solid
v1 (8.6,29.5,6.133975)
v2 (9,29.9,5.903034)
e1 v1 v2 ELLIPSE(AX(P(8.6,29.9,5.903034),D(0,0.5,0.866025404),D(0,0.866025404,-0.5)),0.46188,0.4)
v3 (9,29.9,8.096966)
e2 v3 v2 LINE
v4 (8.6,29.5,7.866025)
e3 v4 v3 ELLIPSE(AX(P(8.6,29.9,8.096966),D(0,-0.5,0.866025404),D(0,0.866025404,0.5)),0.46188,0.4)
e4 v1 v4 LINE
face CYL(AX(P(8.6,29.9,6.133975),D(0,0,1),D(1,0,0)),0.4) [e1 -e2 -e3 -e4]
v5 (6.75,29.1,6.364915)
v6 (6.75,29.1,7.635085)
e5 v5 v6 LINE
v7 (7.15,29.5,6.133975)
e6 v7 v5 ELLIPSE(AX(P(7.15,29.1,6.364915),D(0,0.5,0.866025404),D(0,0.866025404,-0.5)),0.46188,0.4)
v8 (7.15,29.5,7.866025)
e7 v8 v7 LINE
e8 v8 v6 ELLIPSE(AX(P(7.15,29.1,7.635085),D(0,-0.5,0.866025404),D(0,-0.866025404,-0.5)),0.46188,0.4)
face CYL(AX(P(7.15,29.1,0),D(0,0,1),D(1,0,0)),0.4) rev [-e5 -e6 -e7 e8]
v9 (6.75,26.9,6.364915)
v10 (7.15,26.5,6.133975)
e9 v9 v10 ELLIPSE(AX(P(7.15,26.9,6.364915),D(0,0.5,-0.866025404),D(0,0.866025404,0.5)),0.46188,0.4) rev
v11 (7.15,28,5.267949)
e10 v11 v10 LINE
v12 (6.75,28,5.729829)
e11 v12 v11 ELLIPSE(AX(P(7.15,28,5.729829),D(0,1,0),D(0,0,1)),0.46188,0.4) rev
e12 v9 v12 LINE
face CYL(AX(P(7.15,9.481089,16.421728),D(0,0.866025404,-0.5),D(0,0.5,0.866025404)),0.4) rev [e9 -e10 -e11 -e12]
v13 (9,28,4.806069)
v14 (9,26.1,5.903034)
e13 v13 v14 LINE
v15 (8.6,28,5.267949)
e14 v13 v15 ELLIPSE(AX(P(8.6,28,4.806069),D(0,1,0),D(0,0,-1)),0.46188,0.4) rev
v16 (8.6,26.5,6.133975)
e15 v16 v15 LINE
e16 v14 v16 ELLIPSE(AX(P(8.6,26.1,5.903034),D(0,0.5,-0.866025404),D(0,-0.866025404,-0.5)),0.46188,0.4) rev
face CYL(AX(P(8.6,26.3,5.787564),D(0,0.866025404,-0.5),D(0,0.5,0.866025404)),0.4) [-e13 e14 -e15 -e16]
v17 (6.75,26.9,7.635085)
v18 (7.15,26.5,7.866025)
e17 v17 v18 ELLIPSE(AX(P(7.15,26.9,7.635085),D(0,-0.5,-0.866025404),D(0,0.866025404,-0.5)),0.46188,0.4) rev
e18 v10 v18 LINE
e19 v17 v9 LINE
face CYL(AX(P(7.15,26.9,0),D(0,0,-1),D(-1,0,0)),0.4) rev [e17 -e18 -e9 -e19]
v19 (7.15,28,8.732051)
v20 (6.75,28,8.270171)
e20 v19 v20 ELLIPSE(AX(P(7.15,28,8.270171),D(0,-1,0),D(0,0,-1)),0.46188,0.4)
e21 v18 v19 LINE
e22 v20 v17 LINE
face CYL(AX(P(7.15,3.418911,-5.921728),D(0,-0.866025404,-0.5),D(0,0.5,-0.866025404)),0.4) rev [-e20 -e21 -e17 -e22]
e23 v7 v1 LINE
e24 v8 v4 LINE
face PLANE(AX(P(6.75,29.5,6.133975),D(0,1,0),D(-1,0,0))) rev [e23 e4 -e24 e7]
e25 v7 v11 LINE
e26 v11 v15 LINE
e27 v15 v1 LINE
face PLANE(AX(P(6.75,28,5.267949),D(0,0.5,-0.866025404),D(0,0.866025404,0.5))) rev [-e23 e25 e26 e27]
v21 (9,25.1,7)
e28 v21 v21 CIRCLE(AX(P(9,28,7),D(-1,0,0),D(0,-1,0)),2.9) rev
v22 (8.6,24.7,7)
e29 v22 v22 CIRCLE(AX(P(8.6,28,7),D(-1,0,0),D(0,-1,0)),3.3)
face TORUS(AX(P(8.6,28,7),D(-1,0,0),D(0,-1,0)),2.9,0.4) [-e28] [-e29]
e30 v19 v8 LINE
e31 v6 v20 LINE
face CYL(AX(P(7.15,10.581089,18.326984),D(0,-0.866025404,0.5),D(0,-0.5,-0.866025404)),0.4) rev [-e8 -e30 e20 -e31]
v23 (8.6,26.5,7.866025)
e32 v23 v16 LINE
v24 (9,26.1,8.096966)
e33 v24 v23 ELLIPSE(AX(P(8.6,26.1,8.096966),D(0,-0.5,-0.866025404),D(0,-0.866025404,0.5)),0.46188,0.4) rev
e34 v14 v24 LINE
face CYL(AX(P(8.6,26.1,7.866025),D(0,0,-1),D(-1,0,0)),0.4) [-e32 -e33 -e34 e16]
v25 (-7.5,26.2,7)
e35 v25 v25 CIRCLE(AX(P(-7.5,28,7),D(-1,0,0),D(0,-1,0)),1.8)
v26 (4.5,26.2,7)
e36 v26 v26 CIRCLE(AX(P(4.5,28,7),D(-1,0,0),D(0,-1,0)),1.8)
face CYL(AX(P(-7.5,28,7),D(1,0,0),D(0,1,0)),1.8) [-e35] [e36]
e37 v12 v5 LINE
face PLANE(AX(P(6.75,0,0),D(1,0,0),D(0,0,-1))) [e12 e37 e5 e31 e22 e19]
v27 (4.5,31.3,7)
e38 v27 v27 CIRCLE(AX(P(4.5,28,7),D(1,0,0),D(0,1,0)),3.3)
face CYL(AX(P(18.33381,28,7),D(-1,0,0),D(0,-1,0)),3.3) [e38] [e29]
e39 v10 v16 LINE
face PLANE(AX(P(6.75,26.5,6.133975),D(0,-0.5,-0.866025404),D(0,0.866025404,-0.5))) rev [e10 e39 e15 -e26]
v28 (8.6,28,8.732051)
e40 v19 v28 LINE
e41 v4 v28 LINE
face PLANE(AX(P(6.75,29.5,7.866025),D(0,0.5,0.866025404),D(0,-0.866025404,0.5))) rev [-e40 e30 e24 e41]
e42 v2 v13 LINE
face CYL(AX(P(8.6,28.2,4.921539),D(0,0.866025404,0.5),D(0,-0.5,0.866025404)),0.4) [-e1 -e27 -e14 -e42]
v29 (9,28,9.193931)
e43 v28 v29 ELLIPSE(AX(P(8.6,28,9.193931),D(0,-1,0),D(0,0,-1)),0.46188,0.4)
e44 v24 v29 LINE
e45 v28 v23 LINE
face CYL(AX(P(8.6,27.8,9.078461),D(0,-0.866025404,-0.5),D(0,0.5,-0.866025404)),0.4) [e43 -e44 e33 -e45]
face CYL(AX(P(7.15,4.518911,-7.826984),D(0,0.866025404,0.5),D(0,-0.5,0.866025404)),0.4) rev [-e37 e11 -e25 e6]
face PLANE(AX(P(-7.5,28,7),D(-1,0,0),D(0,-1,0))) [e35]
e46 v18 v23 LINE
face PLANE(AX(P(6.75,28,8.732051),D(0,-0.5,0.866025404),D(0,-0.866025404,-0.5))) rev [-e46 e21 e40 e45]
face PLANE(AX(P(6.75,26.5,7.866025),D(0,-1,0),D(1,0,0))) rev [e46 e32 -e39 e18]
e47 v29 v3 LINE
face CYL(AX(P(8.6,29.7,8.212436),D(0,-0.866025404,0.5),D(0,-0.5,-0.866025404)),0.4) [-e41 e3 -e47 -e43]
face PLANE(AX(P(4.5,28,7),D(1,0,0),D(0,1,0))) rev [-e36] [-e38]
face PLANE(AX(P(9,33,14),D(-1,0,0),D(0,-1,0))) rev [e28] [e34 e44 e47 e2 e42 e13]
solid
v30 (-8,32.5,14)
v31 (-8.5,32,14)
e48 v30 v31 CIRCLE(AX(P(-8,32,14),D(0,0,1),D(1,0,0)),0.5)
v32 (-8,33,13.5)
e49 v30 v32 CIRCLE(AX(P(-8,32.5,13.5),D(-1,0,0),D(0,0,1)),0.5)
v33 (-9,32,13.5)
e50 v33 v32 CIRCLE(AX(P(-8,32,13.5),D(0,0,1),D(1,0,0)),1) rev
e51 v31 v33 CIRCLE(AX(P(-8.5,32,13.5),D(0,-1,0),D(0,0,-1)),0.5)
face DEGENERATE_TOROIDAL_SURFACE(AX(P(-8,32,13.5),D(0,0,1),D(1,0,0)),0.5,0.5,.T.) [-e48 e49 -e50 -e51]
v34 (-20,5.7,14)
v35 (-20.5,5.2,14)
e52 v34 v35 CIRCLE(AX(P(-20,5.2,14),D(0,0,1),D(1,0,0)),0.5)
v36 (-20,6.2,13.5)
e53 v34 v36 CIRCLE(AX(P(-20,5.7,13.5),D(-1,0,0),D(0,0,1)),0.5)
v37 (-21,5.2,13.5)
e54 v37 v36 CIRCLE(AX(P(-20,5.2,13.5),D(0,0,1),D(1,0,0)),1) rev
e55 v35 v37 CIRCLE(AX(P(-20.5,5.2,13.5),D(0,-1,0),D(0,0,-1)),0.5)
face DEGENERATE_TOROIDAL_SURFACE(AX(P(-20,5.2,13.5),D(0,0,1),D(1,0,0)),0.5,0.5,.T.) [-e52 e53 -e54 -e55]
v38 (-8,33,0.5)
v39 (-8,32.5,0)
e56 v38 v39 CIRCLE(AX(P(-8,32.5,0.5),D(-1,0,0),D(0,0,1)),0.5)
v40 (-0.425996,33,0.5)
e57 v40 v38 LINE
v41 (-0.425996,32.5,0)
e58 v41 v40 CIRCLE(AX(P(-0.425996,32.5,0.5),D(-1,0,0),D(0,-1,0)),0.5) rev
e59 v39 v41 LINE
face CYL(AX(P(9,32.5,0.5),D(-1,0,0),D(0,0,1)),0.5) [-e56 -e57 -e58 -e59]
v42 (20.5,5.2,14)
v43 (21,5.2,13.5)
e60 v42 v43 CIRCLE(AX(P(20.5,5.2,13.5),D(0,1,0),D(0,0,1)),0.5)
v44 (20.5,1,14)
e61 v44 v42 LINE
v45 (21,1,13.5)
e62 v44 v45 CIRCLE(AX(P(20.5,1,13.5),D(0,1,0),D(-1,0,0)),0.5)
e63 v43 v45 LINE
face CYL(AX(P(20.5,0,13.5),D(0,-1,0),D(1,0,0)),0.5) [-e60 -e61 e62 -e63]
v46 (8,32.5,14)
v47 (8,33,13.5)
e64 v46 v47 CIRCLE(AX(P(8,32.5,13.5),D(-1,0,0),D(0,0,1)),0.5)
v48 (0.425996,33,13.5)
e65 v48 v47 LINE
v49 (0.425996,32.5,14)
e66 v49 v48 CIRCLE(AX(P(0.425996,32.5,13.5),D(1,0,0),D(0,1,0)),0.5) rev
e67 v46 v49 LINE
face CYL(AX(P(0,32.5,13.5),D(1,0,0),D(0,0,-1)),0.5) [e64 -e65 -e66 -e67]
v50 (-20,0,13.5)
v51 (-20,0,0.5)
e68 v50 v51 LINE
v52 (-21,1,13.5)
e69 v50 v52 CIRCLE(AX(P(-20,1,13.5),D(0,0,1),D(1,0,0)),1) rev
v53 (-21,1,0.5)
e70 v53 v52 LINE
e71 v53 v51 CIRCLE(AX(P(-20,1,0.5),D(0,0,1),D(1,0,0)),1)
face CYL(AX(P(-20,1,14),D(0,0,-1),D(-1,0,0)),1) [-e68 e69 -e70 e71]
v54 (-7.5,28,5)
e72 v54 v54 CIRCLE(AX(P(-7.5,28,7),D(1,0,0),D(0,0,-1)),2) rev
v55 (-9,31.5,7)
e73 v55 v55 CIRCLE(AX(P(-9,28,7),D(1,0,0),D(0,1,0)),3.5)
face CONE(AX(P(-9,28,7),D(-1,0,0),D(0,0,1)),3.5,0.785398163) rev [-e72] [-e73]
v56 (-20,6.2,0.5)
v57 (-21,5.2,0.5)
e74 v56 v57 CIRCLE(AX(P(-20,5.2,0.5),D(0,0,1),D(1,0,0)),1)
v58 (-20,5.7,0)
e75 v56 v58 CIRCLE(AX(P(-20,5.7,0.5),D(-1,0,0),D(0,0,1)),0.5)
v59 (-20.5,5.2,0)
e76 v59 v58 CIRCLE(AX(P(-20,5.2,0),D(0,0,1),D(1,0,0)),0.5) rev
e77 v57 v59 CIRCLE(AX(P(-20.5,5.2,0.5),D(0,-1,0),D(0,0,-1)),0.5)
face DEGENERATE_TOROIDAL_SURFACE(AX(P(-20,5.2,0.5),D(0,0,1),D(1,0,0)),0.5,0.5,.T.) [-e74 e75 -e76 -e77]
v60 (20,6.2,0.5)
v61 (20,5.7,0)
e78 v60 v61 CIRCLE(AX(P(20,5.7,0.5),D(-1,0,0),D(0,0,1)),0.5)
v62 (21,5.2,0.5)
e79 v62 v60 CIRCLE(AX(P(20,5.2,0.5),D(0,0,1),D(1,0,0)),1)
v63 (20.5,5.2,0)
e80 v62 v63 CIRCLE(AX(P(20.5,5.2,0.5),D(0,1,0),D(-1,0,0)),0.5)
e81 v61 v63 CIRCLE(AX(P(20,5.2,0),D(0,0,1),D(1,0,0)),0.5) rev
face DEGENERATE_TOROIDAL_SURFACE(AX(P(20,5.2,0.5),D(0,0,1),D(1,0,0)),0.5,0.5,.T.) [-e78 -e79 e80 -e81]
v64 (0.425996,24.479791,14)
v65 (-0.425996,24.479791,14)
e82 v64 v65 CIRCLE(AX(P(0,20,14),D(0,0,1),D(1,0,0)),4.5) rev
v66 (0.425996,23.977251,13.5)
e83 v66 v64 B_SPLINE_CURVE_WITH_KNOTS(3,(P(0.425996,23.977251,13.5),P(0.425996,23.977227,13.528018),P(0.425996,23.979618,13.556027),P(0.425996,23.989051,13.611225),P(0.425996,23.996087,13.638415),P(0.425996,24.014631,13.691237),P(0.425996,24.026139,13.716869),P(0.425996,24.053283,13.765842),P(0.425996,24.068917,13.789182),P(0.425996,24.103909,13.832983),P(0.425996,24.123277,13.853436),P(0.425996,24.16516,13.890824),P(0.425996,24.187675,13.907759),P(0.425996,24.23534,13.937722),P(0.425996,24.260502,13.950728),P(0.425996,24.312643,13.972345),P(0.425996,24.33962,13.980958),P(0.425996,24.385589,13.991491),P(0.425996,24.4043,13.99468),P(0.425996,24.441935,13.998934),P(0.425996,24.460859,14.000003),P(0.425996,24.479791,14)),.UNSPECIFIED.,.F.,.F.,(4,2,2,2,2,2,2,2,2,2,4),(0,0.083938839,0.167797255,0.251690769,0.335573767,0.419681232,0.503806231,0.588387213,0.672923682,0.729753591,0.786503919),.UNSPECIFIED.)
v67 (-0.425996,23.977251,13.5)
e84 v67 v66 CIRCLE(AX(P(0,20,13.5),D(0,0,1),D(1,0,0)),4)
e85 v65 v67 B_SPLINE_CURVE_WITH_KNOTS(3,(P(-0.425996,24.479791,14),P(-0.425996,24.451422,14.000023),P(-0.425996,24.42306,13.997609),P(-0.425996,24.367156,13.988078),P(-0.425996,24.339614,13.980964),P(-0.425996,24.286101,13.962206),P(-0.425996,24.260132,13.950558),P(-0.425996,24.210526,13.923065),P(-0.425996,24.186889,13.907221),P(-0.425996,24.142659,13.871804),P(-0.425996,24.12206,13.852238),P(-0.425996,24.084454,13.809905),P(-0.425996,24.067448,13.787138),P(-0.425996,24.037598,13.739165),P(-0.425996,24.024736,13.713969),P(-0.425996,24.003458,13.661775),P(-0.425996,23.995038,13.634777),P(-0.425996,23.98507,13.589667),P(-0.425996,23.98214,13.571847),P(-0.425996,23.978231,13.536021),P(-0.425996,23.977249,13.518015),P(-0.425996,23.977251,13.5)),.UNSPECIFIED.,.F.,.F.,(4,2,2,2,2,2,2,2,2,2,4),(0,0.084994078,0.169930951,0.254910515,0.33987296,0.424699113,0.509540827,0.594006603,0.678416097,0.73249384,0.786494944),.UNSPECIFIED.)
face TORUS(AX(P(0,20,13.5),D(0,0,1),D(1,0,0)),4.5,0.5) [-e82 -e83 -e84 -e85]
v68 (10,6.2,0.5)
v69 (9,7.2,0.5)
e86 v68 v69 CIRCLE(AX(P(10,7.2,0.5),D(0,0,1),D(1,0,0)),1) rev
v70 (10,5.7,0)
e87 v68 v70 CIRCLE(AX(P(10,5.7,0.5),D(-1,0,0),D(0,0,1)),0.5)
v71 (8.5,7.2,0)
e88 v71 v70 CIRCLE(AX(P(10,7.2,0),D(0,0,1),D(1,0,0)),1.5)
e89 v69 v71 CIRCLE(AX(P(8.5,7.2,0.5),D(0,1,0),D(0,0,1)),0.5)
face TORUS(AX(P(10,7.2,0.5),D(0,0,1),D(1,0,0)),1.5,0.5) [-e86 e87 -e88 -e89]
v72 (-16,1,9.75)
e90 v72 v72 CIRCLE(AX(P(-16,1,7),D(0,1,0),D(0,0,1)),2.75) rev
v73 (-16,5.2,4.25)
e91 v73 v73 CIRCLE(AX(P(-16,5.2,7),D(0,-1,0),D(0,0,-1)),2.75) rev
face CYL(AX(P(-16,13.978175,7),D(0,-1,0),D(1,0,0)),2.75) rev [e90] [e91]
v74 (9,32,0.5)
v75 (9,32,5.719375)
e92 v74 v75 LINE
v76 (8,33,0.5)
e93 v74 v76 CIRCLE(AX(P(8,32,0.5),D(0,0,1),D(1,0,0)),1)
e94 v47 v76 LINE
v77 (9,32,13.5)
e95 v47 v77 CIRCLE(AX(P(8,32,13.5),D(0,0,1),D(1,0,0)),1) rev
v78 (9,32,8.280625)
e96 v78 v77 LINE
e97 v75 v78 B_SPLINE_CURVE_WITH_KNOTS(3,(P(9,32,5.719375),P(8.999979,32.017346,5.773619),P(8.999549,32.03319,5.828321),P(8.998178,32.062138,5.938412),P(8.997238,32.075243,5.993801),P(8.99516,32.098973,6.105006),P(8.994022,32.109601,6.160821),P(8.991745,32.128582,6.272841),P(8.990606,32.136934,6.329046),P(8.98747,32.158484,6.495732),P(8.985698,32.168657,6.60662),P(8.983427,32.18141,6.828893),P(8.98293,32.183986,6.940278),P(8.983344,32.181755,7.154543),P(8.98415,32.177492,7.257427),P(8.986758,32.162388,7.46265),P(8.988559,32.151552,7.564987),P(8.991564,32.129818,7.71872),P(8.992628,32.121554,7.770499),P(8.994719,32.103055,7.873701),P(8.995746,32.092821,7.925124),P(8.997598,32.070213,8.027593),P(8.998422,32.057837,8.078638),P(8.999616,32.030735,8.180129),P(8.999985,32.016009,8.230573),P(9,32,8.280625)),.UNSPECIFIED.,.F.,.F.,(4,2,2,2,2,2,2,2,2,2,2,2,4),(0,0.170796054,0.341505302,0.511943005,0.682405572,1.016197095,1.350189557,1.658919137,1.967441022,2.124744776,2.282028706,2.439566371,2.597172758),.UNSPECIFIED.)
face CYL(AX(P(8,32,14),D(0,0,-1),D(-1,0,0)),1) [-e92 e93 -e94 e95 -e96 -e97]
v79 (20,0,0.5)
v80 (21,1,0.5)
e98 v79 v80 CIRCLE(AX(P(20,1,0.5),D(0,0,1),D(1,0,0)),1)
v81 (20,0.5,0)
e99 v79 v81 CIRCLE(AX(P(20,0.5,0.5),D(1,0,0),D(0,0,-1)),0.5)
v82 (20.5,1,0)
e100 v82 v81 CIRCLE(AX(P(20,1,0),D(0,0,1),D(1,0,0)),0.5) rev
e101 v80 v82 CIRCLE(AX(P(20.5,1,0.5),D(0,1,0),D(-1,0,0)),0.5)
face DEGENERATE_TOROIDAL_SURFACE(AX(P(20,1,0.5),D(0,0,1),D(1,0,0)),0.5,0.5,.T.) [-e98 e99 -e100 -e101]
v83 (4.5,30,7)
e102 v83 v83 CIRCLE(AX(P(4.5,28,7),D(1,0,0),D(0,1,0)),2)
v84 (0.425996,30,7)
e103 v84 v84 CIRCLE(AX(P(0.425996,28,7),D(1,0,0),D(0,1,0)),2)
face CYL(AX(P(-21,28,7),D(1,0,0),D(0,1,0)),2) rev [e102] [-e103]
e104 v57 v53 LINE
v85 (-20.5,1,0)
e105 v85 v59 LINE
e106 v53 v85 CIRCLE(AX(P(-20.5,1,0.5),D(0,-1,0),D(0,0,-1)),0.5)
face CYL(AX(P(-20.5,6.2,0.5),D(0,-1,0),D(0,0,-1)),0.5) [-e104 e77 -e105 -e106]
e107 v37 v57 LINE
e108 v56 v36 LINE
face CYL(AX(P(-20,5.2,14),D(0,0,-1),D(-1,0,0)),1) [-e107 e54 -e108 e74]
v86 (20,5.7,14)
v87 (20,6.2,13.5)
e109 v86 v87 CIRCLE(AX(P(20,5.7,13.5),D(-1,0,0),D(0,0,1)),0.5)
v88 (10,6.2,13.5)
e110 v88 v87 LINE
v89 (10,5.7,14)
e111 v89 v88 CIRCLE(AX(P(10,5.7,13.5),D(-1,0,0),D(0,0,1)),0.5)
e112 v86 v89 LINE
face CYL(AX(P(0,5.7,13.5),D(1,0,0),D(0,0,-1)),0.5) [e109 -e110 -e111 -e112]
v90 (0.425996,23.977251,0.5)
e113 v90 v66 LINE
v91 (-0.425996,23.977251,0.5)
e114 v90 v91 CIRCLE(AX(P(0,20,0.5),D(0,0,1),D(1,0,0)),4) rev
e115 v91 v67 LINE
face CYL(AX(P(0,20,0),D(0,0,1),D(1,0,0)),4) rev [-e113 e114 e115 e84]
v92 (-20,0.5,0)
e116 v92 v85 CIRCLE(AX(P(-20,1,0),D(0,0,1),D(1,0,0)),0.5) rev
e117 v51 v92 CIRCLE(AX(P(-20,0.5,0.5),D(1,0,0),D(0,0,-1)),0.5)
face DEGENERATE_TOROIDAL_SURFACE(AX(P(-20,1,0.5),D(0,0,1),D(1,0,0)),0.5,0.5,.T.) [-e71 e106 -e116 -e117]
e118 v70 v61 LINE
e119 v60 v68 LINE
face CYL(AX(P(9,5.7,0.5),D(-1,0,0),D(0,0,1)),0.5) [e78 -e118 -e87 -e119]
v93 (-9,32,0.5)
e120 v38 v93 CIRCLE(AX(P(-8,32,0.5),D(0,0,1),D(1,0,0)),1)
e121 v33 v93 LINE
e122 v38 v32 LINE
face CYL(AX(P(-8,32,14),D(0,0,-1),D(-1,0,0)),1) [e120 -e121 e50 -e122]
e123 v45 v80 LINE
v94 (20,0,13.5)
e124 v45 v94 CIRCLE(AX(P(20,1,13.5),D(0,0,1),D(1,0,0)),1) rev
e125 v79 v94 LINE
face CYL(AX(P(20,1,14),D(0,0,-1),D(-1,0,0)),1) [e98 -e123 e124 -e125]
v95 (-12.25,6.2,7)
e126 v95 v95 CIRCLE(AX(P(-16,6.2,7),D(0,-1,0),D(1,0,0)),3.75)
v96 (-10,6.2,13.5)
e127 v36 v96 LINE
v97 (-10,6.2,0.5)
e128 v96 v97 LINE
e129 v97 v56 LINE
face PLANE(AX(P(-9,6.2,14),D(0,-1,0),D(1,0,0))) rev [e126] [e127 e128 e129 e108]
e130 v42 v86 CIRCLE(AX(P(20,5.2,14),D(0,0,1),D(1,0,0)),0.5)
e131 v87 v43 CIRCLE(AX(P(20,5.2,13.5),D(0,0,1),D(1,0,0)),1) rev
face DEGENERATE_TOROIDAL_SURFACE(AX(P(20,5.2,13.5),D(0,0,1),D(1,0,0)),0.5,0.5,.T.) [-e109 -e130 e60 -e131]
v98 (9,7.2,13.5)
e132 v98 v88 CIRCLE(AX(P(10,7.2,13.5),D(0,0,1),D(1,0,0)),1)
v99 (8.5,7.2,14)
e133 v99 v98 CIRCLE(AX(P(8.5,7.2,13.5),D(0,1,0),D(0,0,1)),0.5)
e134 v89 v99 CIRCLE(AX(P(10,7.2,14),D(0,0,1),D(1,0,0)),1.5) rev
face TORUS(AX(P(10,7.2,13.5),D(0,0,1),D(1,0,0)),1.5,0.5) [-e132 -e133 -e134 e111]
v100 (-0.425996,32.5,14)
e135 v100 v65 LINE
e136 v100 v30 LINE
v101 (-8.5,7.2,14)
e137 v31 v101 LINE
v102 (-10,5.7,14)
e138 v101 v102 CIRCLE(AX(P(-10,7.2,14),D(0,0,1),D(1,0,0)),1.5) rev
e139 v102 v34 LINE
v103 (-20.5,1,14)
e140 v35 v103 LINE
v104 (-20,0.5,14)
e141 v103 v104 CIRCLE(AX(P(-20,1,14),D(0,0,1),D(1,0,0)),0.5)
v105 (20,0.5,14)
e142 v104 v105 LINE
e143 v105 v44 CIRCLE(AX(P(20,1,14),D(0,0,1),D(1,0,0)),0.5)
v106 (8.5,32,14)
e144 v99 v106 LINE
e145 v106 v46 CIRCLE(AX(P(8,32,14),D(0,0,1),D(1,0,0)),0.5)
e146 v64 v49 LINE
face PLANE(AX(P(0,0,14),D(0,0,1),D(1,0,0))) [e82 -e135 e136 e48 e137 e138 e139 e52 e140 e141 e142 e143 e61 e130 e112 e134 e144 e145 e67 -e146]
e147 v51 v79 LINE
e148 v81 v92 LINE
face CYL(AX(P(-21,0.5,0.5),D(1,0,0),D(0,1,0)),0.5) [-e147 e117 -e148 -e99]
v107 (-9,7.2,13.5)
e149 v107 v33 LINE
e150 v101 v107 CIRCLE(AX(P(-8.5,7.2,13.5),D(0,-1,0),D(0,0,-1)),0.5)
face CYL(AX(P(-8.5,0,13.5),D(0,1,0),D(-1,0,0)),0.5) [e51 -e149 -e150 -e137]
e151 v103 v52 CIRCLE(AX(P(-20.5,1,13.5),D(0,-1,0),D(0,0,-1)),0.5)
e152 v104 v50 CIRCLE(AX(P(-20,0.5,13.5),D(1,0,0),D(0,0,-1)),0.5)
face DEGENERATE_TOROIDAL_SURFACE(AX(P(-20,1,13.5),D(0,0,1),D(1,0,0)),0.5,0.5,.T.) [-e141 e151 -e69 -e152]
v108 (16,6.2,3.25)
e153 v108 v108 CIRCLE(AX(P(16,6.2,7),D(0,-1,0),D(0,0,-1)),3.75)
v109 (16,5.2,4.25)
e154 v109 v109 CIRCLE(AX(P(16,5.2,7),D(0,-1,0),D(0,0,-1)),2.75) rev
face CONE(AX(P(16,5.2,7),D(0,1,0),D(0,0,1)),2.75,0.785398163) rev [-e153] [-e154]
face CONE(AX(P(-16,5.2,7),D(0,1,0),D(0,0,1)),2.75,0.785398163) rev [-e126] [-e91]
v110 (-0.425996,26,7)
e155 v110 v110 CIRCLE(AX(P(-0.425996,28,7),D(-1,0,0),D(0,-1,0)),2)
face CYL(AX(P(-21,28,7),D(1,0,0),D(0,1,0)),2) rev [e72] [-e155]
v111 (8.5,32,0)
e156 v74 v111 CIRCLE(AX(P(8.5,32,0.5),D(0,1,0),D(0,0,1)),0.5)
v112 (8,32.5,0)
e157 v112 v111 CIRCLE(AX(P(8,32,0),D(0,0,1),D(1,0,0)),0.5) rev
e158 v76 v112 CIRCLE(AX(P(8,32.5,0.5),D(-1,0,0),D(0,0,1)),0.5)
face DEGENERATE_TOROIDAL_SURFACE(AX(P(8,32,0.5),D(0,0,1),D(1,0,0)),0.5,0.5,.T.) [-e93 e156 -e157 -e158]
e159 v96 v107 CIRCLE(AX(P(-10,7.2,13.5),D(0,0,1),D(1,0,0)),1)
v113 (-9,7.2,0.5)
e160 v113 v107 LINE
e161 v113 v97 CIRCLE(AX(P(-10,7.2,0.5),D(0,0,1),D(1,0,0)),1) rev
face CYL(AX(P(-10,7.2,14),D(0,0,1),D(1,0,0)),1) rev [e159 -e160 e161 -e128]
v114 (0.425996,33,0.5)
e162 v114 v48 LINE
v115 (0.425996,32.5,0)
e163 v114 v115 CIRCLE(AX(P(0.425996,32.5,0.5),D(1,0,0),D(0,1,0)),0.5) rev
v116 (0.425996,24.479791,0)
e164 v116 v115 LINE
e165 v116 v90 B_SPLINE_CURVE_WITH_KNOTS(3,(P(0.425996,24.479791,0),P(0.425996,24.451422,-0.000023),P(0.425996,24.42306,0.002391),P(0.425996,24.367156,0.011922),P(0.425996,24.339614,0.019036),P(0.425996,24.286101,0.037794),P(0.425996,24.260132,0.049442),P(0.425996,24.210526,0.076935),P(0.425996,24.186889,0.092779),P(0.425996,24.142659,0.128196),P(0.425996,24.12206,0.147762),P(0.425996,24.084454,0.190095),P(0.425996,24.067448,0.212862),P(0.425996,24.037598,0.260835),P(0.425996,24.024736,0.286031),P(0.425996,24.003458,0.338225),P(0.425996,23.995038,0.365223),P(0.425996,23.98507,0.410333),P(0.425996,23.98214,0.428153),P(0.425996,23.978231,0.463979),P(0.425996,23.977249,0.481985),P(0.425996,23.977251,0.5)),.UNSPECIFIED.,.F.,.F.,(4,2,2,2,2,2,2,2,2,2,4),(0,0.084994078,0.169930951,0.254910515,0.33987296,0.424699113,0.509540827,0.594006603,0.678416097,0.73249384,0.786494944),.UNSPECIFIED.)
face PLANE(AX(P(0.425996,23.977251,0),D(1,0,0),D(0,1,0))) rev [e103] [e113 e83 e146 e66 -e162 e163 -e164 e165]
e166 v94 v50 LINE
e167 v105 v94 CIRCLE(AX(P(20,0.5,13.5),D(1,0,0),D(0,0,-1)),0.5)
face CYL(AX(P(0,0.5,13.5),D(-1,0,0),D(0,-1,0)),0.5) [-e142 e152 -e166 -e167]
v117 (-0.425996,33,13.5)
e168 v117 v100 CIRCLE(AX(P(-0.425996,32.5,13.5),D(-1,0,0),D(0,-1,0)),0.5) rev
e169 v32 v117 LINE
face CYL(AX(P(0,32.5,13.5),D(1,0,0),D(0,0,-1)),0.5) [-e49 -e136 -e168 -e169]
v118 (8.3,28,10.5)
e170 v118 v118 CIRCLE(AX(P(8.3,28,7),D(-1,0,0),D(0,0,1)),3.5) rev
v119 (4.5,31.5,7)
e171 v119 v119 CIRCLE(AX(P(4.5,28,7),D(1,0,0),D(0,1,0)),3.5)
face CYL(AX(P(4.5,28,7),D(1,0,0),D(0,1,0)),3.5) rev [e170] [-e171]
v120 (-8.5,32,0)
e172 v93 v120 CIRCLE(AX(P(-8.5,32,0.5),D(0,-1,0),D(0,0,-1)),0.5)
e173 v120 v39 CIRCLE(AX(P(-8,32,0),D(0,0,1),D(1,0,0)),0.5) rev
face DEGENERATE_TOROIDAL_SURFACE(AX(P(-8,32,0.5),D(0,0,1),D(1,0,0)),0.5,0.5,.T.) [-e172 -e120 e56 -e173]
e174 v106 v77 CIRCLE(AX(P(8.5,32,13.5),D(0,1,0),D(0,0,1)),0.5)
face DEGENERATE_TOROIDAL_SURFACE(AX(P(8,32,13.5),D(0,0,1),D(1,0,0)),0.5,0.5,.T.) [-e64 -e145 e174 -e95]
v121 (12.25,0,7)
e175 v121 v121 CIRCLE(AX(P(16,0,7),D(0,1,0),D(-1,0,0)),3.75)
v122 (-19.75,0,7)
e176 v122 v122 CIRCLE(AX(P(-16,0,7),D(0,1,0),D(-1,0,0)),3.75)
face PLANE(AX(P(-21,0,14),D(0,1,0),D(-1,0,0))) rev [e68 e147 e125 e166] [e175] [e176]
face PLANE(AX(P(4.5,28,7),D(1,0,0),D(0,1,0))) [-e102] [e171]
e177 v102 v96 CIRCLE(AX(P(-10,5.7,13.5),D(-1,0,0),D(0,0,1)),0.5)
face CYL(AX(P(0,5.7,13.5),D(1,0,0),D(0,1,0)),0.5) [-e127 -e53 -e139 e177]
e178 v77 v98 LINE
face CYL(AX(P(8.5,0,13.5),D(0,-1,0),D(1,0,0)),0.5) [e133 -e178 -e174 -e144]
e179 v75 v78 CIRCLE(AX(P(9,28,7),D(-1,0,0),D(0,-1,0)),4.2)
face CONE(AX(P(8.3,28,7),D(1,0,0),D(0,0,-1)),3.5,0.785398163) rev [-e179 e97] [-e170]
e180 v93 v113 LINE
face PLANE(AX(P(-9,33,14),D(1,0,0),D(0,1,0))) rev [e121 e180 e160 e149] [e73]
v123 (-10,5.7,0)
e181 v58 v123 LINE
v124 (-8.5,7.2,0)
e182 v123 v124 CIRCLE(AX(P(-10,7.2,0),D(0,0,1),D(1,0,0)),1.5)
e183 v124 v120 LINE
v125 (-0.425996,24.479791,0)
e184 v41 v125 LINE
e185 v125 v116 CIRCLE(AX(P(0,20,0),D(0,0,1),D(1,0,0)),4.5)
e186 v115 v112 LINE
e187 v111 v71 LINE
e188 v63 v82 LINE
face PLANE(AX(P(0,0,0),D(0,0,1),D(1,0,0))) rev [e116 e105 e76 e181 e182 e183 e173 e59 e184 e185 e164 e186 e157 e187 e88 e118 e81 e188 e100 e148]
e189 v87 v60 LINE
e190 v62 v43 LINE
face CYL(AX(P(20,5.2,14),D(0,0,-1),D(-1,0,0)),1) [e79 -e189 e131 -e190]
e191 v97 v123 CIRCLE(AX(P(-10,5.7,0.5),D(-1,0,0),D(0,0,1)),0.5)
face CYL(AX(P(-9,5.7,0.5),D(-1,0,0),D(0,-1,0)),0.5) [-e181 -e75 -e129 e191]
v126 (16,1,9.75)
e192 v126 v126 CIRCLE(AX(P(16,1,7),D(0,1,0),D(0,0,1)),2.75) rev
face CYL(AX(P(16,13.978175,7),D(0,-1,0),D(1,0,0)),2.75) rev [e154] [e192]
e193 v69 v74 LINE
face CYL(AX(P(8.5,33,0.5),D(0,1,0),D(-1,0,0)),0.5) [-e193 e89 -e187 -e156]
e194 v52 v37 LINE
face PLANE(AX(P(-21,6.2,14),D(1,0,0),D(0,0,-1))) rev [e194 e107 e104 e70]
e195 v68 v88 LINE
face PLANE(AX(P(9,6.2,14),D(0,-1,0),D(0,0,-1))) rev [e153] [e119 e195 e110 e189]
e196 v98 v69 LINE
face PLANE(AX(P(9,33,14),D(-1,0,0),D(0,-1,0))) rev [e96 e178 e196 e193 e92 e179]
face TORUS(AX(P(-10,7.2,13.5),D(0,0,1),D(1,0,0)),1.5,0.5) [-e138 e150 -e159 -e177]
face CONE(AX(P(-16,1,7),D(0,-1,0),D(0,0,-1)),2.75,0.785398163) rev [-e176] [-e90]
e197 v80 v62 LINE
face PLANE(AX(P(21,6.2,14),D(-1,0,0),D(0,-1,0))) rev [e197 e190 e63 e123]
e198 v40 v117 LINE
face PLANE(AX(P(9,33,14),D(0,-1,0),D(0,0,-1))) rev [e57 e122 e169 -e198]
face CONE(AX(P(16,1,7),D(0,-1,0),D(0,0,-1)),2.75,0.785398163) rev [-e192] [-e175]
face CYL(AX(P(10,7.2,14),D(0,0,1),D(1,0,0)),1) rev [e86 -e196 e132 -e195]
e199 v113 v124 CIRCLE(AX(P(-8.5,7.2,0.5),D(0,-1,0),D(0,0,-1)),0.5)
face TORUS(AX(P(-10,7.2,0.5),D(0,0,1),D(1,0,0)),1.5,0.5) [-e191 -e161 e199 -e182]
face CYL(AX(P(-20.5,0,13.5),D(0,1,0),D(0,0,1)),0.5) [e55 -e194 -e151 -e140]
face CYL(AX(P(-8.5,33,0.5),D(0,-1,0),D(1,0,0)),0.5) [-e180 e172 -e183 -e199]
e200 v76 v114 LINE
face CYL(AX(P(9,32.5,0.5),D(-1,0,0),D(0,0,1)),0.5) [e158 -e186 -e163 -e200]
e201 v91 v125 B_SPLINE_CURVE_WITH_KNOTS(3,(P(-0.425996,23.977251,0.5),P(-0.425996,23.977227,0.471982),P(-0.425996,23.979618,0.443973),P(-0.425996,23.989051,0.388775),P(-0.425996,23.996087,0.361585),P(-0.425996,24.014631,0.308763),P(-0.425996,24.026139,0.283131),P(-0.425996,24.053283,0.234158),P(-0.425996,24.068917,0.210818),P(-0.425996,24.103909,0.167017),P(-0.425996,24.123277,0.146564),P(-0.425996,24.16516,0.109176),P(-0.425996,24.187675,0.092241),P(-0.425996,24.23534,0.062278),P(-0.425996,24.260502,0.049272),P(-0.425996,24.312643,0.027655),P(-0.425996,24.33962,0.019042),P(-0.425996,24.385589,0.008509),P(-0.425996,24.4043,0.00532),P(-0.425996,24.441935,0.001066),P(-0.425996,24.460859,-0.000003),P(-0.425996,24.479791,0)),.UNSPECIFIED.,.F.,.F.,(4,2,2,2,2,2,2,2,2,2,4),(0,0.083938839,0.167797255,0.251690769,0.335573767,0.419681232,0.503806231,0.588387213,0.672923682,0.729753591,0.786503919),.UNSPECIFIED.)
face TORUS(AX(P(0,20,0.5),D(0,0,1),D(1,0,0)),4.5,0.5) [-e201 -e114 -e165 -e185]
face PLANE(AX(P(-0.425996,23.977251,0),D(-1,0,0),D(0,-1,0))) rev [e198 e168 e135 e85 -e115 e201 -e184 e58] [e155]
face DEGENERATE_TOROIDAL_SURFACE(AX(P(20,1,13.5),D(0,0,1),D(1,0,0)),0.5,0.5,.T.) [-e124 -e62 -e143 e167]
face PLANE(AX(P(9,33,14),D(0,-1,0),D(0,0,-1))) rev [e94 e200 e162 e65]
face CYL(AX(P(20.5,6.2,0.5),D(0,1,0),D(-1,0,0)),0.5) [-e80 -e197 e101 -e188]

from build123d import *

# Parameters (mm, degrees)
BOSS_EXTRUDE1_DEPTH = 14
CUT_EXTRUDE1_DEPTH  = 42.545156156
SKETCH3_R           = 2.75
CUT_EXTRUDE2_DEPTH  = 6.2
SKETCH5_R           = 3.5
CUT_EXTRUDE3_DEPTH  = 4.5
SKETCH6_R           = 2
CUT_EXTRUDE4_DEPTH  = 44.991476447
CHAMFER1_SIZE       = 1
CHAMFER2_SIZE       = 1.5
CHAMFER3_SIZE       = 0.7
FILLET1_R           = 1
FILLET2_R           = 0.5
SKETCH7_R           = 3.3
BOSS_EXTRUDE2_DEPTH = 4.5
SKETCH8_R           = 1.8
BOSS_EXTRUDE3_DEPTH = 12
CUT_EXTRUDE5_DEPTH  = 2.25
FILLET3_R           = 0.4


with BuildPart() as part:
    # Sketch1 → Boss-Extrude1 (new body)
    with BuildSketch(Plane.XY):
        Polygon((-21, 6.2), (-21, 0), (21, 0), (21, 6.2), (9, 6.2), (9, 33), (-9, 33), (-9, 6.2), align=None)
    extrude(amount=BOSS_EXTRUDE1_DEPTH)

    # Sketch2 → Cut-Extrude1 (cut, through all)
    with BuildSketch(Plane.XY.offset(14)):
        with BuildLine():
            Line((-0.425995721, 23.977251268), (-0.425995721, 33))
            Line((-0.425995721, 33), (0.425995721, 33))
            Line((0.425995721, 33), (0.425995721, 23.977251268))
            ThreePointArc((0.425995721, 23.977251268), (0, 16), (-0.425995721, 23.977251268))
        make_face()
    extrude(amount=-CUT_EXTRUDE1_DEPTH, mode=Mode.SUBTRACT)

    # Sketch3 → Cut-Extrude2 (cut)
    with BuildSketch(Plane.XZ):
        with Locations((-16, 7)):
            Circle(SKETCH3_R)
        with Locations((16, 7)):
            Circle(SKETCH3_R)
    extrude(amount=-CUT_EXTRUDE2_DEPTH, mode=Mode.SUBTRACT)

    # Sketch5 → Cut-Extrude3 (cut)
    with BuildSketch(Plane(origin=(9, 0, 0), x_dir=(0, 0, -1), z_dir=(1, 0, 0))):
        with Locations(Location((-7, 28, 0), (0, 0, 90))):
            Circle(SKETCH5_R)
    extrude(amount=-CUT_EXTRUDE3_DEPTH, mode=Mode.SUBTRACT)

    # Sketch6 → Cut-Extrude4 (cut, through all)
    with BuildSketch(Plane(origin=(4.5, 0, 0), x_dir=(0, 0, -1), z_dir=(1, 0, 0))):
        with Locations(Location((-7, 28, 0), (0, 0, 90))):
            Circle(SKETCH6_R)
    extrude(amount=-CUT_EXTRUDE4_DEPTH, mode=Mode.SUBTRACT)

    # Chamfer1
    chamfer1_edges = [part.edges().sort_by_distance(p)[0] for p in [
        (-18.75, 0, 7),
        (-18.75, 6.2, 7),
        (13.25, 0, 7),
        (13.25, 6.2, 7),
    ]]
    chamfer(chamfer1_edges, length=CHAMFER1_SIZE)

    # Chamfer2
    chamfer2_edges = [part.edges().sort_by_distance(p)[0] for p in [
        (-9, 26, 7),
    ]]
    chamfer(chamfer2_edges, length=CHAMFER2_SIZE)

    # Chamfer3
    chamfer3_edges = [part.edges().sort_by_distance(p)[0] for p in [
        (9, 24.5, 7),
    ]]
    chamfer(chamfer3_edges, length=CHAMFER3_SIZE)

    # Fillet1
    # the kernel refuses this fillet: 1 mm, written as the material it adds along each edge
    with BuildSketch(Plane(origin=(-9, 6.2, 0), x_dir=(-1, 0, 0), z_dir=(0, 0, 1)), Plane(origin=(9, 6.2, 0), x_dir=(0, 1, 0), z_dir=(0, 0, 1))) as fillet1_piece_1:
        with BuildLine():
            CenterArc((FILLET1_R, -FILLET1_R), FILLET1_R, 90, 90)
            Line((0, -FILLET1_R), (0, 0))
            Line((0, 0), (FILLET1_R, 0))
        make_face()
    extrude(amount=14)
    # the kernel refuses this fillet: 1 mm, written as the material it takes off along each edge
    with BuildSketch(Plane(origin=(-9, 33, -2.5), x_dir=(0, -1, 0), z_dir=(0, 0, 1)), Plane(origin=(21, 6.2, -2.5), x_dir=(-1, 0, 0), z_dir=(0, 0, 1)), Plane(origin=(21, 0, -2.5), x_dir=(0, 1, 0), z_dir=(0, 0, 1)), Plane(origin=(-21, 0, -2.5), x_dir=(1, 0, 0), z_dir=(0, 0, 1))) as fillet1_2_piece_1:
        with BuildLine():
            CenterArc((FILLET1_R, FILLET1_R), FILLET1_R, 180, 90)
            Line((0, FILLET1_R), (0, 0))
            Line((0, 0), (FILLET1_R, 0))
        make_face()
    extrude(amount=19, mode=Mode.SUBTRACT)
    with BuildSketch(Plane(origin=(9, 33, -2.5), x_dir=(0, -1, 0), z_dir=(0, 0, 1)), Plane(origin=(-21, 6.2, -2.5), x_dir=(1, 0, 0), z_dir=(0, 0, 1))) as fillet1_2_piece_2:
        with BuildLine():
            CenterArc((FILLET1_R, -FILLET1_R), FILLET1_R, 90, 90)
            Line((0, -FILLET1_R), (0, 0))
            Line((0, 0), (FILLET1_R, 0))
        make_face()
    extrude(amount=19, mode=Mode.SUBTRACT)

    # Fillet2
    fillet2_edges = [part.edges().sort_by_distance(p)[0] for p in [
        (20.707106781, 0.292893219, 14),
        (-20.707106781, 5.907106781, 14),
        (-20.707106781, 0.292893219, 14),
        (-9.292893219, 6.492893219, 0),
        (-9.292893219, 6.492893219, 14),
        (9.292893219, 6.492893219, 0),
        (9.292893219, 6.492893219, 14),
        (-4.21299786, 33, 0),
        (-4.21299786, 33, 14),
        (0, 16, 0),
        (0, 16, 14),
        (0, 0, 0),
        (0, 0, 14),
        (4.21299786, 33, 0),
        (9, 19.6, 0),
        (15, 6.2, 0),
        (21, 3.1, 0),
        (-21, 3.1, 0),
        (-15, 6.2, 0),
        (-9, 19.6, 0),
        (8.707106781, 32.707106781, 0),
        (-8.707106781, 32.707106781, 0),
        (20.707106781, 5.907106781, 0),
        (20.707106781, 0.292893219, 0),
        (-20.707106781, 5.907106781, 0),
        (-20.707106781, 0.292893219, 0),
        (-21, 3.1, 14),
        (-9, 19.6, 14),
        (-15, 6.2, 14),
        (21, 3.1, 14),
        (15, 6.2, 14),
        (9, 19.6, 14),
        (4.21299786, 33, 14),
        (8.707106781, 32.707106781, 14),
        (-8.707106781, 32.707106781, 14),
        (20.707106781, 5.907106781, 14),
    ]]
    fillet(fillet2_edges, radius=FILLET2_R)


with BuildPart() as body_2:
    # Sketch7 → Boss-Extrude2 (new body)
    with BuildSketch(Plane(origin=(4.5, 0, 0), x_dir=(0, 0, -1), z_dir=(1, 0, 0))):
        with Locations(Location((-7, 28, 0), (0, 0, 270))):
            Circle(SKETCH7_R)
    extrude(amount=BOSS_EXTRUDE2_DEPTH)

    # Sketch8 → Boss-Extrude3 (add)
    with BuildSketch(Plane.ZY.offset(-4.5)):
        with Locations(Location((7, 28, 0), (0, 0, 270))):
            Circle(SKETCH8_R)
    extrude(amount=BOSS_EXTRUDE3_DEPTH)

    # Sketch9 → Cut-Extrude5 (cut)
    with BuildSketch(Plane(origin=(9, 0, 0), x_dir=(0, 0, -1), z_dir=(1, 0, 0))):
        Polygon((-7.866025404, 29.5), (-8.732050808, 28), (-7.866025404, 26.5), (-6.133974596, 26.5), (-5.267949192, 28), (-6.133974596, 29.5), align=None)
    extrude(amount=-CUT_EXTRUDE5_DEPTH, mode=Mode.SUBTRACT)

    # Fillet3
    fillet3_edges = [body_2.edges().sort_by_distance(p)[0] for p in [
        (6.75, 29.5, 7),
        (6.75, 28.75, 5.700961894),
        (6.75, 27.25, 5.700961894),
        (6.75, 26.5, 7),
        (6.75, 27.25, 8.299038106),
        (6.75, 28.75, 8.299038106),
        (9, 29.5, 7),
        (9, 28.75, 8.299038106),
        (9, 27.25, 8.299038106),
        (9, 26.5, 7),
        (9, 27.25, 5.700961894),
        (9, 28.75, 5.700961894),
        (9, 31.3, 7),
    ]]
    fillet(fillet3_edges, radius=FILLET3_R)


solid = Compound([part.part, body_2.part])
